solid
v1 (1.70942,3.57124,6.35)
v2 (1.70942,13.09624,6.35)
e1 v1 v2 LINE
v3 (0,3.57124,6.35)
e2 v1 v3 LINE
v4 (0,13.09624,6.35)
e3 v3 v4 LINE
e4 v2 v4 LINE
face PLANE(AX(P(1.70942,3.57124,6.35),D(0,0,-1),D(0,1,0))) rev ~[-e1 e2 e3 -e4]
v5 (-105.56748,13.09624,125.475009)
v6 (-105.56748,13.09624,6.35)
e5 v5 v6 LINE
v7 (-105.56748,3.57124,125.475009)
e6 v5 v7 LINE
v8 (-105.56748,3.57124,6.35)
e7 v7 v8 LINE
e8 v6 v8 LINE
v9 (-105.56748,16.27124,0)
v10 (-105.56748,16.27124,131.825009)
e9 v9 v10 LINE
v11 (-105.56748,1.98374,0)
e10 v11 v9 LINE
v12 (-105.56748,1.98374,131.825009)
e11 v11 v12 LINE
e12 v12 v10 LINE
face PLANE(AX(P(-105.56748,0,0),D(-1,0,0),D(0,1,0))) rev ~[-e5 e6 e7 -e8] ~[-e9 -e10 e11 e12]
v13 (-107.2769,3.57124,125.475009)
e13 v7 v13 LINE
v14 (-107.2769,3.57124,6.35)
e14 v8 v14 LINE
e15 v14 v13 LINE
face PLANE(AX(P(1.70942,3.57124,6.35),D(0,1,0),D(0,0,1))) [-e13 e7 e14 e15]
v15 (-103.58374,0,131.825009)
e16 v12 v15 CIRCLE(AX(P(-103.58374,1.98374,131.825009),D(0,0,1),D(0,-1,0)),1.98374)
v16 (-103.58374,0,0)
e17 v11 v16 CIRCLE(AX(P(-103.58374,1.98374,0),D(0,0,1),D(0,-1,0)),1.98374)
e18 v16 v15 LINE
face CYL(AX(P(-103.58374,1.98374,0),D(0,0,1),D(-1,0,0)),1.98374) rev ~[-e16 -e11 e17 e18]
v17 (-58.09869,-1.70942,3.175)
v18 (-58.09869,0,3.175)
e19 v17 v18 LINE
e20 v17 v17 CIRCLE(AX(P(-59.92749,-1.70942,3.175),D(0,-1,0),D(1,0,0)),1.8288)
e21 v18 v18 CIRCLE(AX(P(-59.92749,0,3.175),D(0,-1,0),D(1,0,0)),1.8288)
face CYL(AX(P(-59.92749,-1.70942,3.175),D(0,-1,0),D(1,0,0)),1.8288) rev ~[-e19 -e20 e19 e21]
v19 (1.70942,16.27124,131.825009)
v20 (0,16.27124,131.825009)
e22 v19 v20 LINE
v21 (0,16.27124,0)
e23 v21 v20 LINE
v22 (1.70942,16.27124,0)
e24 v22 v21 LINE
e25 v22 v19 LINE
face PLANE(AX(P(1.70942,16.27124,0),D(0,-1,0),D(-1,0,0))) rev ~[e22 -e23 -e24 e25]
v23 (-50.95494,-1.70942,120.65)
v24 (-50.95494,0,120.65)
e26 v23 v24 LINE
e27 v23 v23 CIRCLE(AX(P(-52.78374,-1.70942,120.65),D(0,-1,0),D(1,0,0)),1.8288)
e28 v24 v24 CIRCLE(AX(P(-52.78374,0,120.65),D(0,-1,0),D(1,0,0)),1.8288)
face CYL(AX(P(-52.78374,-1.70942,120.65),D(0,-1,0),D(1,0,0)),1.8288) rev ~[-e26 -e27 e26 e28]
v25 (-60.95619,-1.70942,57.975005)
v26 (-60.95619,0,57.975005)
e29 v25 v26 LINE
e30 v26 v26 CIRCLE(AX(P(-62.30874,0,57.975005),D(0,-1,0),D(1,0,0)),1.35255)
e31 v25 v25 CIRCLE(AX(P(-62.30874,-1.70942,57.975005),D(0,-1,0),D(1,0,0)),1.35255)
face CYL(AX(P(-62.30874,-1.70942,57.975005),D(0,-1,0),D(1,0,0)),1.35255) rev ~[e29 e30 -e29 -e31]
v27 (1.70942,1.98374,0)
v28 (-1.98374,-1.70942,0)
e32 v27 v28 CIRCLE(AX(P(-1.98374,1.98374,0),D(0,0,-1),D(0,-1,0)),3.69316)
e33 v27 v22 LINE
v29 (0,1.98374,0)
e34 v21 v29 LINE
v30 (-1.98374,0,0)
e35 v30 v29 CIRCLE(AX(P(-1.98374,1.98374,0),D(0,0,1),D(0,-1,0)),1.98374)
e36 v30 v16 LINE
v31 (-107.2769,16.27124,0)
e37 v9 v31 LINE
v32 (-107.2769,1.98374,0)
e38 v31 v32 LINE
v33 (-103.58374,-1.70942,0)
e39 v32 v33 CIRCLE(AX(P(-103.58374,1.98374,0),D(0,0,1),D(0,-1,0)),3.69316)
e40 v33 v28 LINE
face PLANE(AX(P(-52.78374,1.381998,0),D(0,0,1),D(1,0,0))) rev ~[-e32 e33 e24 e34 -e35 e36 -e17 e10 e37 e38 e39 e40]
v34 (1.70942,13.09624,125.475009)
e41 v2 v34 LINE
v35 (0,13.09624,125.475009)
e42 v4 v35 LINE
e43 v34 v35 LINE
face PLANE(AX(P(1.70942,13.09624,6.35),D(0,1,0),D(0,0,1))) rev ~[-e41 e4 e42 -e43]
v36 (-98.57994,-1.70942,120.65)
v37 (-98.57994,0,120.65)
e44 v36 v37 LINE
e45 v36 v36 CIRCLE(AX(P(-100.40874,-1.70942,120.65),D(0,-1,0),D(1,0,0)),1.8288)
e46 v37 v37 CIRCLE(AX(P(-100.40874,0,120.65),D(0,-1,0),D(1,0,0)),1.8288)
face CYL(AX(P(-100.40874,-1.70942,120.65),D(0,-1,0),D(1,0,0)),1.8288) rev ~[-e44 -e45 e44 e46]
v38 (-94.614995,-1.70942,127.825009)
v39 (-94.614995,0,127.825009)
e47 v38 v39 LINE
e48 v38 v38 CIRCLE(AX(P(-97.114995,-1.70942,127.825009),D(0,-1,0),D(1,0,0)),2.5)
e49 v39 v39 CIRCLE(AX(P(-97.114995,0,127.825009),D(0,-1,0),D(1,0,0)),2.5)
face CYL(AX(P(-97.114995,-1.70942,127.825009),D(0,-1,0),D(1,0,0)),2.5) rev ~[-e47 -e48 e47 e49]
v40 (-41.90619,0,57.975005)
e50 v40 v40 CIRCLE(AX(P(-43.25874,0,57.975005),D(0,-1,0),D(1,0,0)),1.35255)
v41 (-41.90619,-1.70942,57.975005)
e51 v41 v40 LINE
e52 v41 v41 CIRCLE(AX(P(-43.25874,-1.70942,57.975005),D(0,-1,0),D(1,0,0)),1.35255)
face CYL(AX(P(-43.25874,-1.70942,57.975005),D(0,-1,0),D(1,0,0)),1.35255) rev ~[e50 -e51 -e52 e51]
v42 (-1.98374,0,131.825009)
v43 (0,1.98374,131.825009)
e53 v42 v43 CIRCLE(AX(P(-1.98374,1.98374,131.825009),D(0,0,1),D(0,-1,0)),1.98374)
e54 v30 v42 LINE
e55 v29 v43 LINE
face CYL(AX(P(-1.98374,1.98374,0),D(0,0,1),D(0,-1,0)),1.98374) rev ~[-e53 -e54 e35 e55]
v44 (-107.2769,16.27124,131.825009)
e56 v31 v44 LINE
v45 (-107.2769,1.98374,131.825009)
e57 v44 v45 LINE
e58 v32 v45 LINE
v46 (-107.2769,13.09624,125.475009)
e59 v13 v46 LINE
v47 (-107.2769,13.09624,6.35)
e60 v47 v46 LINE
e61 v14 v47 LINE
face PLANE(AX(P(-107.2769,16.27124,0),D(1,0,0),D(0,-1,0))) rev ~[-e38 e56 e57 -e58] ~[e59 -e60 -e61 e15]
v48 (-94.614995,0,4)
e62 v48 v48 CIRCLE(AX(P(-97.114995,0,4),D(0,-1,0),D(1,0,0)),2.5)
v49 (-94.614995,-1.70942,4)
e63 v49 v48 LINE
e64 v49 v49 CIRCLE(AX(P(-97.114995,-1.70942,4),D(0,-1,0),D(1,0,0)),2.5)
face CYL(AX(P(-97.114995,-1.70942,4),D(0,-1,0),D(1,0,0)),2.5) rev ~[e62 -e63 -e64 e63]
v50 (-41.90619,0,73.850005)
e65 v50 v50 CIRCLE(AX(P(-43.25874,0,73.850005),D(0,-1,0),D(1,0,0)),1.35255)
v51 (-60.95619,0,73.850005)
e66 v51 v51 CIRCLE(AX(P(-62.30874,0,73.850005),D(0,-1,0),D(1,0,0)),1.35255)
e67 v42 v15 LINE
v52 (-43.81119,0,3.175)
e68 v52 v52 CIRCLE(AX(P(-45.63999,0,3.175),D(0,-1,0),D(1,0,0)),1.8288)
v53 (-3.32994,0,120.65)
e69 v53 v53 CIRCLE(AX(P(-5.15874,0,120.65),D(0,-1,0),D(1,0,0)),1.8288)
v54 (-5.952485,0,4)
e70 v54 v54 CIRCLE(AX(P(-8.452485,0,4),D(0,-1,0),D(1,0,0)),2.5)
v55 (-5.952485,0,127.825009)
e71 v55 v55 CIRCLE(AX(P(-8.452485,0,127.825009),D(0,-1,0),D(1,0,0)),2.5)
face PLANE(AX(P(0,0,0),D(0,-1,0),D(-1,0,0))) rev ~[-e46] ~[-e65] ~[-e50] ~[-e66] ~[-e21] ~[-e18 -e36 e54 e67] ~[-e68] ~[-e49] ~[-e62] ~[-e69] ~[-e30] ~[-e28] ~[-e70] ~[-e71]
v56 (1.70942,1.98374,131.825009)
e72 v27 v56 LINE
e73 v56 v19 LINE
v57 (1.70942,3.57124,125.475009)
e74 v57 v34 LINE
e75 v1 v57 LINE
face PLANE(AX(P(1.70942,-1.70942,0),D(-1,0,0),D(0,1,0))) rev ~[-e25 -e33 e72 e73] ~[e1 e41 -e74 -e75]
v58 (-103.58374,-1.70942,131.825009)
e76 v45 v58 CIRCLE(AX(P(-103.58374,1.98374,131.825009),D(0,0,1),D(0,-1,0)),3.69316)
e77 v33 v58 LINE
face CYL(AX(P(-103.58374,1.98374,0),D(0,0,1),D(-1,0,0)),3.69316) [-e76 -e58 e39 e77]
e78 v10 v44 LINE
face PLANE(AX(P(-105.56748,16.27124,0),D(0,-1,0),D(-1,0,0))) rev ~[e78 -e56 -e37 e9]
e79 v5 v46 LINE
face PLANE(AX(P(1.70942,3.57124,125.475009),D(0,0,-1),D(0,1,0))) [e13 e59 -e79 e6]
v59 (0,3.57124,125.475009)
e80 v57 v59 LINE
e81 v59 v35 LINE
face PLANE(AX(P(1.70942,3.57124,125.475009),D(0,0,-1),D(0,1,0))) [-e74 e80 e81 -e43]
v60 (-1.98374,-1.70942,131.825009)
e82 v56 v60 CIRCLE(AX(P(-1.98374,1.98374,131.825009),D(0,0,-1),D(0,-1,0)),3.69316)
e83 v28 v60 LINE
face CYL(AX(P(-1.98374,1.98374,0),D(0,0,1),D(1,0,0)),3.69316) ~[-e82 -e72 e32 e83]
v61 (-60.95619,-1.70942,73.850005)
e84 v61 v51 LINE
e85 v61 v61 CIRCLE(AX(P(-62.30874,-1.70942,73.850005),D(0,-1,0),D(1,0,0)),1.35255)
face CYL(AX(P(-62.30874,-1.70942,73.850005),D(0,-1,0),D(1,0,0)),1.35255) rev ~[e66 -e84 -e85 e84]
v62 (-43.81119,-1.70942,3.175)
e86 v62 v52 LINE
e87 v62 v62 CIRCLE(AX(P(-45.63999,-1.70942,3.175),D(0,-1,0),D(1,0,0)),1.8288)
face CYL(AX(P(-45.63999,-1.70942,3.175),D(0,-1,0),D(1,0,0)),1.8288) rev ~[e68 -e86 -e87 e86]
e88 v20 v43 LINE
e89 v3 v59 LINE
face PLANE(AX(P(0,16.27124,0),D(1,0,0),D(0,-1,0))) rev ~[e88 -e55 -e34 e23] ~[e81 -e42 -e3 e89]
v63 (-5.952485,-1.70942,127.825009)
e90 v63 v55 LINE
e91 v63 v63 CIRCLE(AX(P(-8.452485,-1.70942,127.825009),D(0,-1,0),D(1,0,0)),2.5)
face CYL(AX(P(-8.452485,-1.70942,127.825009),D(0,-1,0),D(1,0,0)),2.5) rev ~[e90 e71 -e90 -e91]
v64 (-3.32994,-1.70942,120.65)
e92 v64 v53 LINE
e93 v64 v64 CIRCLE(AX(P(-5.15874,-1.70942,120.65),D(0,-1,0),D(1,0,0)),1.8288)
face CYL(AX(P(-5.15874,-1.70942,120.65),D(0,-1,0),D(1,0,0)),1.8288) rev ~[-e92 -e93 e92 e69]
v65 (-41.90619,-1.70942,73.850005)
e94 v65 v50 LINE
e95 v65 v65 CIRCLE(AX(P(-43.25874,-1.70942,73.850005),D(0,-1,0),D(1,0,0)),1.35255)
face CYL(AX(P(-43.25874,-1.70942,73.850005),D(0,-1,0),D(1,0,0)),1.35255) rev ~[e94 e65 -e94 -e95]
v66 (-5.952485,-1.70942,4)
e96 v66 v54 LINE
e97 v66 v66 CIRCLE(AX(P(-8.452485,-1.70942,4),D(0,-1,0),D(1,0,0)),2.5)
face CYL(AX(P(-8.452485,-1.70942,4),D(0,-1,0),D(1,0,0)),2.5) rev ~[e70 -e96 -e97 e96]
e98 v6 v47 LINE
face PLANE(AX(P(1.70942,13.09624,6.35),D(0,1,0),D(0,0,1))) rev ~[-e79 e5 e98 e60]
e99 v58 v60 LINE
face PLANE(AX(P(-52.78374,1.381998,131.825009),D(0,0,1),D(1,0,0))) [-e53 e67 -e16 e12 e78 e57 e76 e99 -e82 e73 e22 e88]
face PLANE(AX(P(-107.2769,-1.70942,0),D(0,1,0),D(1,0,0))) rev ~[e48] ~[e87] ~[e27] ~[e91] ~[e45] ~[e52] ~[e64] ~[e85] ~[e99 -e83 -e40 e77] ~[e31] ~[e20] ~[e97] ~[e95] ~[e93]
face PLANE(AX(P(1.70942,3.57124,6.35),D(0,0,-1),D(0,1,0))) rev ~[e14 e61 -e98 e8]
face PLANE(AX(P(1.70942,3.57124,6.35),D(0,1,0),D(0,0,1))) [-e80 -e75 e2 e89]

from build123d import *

# Parameters (mm, degrees)
F1_DEPTH  = 131.8250094
F2_W      = 9.525
F2_H      = 119.1250094
F3_DEPTH  = 108.98632
F4_R      = 3.69316
F5_R      = 1.98374
F6_R      = 1.8288
F7_DEPTH  = 257
F8_R      = 2.5
F9_DEPTH  = 1.70942
F10_R     = 1.35255
F11_DEPTH = 1.70942


# Not quite as in the source:
# - an extrude ends at something that could not be found from the text; its depth is read off the source's solid


with BuildPart() as f1:
    # F0 (on Top) → F1 (new body)
    with BuildSketch(Plane.XY):
        Polygon((0, 16.27124), (0, 0), (-105.56748, 0), (-105.56748, 16.27124), (-107.2769, 16.27124), (-107.2769, -1.70942), (1.70942, -1.70942), (1.70942, 16.27124), align=None)
    extrude(amount=F1_DEPTH)

    # F2 (on face) → F3 (cut, through all)
    with BuildSketch(Plane.YZ.offset(1.70942)):
        with Locations((8.33374, 65.9125047)):
            Rectangle(F2_W, F2_H)
    extrude(amount=-F3_DEPTH, mode=Mode.SUBTRACT)

    # F4
    f4_edges = [f1.edges().sort_by_distance(p)[0] for p in [
        (1.70942, -1.70942, 65.912505),
        (-107.2769, -1.70942, 65.912505),
    ]]
    fillet(f4_edges, radius=F4_R)

    # F5
    f5_edges = [f1.edges().sort_by_distance(p)[0] for p in [
        (0, 0, 65.912505),
        (-105.56748, 0, 65.912505),
    ]]
    fillet(f5_edges, radius=F5_R)

    # F6 (on face) → F7 (cut, through all)
    with BuildSketch(Plane.XZ.offset(1.70942)):
        with Locations((-52.78374, 120.65)):
            Circle(F6_R)
        with Locations((-5.15874, 120.65)):
            Circle(F6_R)
        with Locations((-100.40874, 120.65)):
            Circle(F6_R)
        with Locations((-45.63999, 3.175)):
            Circle(F6_R)
        with Locations((-59.92749, 3.175)):
            Circle(F6_R)
    extrude(amount=-F7_DEPTH, mode=Mode.SUBTRACT)

    # F8 (on face) → F9 (cut, through all)
    with BuildSketch(Plane.XZ.offset(1.70942)):
        with Locations((-8.452485, 127.8250094)):
            Circle(F8_R)
        with Locations((-8.452485, 4)):
            Circle(F8_R)
        with Locations((-97.114995, 4)):
            Circle(F8_R)
        with Locations((-97.114995, 127.8250094)):
            Circle(F8_R)
    extrude(amount=-F9_DEPTH, mode=Mode.SUBTRACT)

    # F10 (on face) → F11 (cut, through all)
    with BuildSketch(Plane.XZ.offset(1.70942)):
        with Locations((-43.25874, 57.9750047)):
            Circle(F10_R)
        with Locations((-43.25874, 73.8500047)):
            Circle(F10_R)
        with Locations((-62.30874, 57.9750047)):
            Circle(F10_R)
        with Locations((-62.30874, 73.8500047)):
            Circle(F10_R)
    extrude(amount=-F11_DEPTH, mode=Mode.SUBTRACT)


solid = f1.part
